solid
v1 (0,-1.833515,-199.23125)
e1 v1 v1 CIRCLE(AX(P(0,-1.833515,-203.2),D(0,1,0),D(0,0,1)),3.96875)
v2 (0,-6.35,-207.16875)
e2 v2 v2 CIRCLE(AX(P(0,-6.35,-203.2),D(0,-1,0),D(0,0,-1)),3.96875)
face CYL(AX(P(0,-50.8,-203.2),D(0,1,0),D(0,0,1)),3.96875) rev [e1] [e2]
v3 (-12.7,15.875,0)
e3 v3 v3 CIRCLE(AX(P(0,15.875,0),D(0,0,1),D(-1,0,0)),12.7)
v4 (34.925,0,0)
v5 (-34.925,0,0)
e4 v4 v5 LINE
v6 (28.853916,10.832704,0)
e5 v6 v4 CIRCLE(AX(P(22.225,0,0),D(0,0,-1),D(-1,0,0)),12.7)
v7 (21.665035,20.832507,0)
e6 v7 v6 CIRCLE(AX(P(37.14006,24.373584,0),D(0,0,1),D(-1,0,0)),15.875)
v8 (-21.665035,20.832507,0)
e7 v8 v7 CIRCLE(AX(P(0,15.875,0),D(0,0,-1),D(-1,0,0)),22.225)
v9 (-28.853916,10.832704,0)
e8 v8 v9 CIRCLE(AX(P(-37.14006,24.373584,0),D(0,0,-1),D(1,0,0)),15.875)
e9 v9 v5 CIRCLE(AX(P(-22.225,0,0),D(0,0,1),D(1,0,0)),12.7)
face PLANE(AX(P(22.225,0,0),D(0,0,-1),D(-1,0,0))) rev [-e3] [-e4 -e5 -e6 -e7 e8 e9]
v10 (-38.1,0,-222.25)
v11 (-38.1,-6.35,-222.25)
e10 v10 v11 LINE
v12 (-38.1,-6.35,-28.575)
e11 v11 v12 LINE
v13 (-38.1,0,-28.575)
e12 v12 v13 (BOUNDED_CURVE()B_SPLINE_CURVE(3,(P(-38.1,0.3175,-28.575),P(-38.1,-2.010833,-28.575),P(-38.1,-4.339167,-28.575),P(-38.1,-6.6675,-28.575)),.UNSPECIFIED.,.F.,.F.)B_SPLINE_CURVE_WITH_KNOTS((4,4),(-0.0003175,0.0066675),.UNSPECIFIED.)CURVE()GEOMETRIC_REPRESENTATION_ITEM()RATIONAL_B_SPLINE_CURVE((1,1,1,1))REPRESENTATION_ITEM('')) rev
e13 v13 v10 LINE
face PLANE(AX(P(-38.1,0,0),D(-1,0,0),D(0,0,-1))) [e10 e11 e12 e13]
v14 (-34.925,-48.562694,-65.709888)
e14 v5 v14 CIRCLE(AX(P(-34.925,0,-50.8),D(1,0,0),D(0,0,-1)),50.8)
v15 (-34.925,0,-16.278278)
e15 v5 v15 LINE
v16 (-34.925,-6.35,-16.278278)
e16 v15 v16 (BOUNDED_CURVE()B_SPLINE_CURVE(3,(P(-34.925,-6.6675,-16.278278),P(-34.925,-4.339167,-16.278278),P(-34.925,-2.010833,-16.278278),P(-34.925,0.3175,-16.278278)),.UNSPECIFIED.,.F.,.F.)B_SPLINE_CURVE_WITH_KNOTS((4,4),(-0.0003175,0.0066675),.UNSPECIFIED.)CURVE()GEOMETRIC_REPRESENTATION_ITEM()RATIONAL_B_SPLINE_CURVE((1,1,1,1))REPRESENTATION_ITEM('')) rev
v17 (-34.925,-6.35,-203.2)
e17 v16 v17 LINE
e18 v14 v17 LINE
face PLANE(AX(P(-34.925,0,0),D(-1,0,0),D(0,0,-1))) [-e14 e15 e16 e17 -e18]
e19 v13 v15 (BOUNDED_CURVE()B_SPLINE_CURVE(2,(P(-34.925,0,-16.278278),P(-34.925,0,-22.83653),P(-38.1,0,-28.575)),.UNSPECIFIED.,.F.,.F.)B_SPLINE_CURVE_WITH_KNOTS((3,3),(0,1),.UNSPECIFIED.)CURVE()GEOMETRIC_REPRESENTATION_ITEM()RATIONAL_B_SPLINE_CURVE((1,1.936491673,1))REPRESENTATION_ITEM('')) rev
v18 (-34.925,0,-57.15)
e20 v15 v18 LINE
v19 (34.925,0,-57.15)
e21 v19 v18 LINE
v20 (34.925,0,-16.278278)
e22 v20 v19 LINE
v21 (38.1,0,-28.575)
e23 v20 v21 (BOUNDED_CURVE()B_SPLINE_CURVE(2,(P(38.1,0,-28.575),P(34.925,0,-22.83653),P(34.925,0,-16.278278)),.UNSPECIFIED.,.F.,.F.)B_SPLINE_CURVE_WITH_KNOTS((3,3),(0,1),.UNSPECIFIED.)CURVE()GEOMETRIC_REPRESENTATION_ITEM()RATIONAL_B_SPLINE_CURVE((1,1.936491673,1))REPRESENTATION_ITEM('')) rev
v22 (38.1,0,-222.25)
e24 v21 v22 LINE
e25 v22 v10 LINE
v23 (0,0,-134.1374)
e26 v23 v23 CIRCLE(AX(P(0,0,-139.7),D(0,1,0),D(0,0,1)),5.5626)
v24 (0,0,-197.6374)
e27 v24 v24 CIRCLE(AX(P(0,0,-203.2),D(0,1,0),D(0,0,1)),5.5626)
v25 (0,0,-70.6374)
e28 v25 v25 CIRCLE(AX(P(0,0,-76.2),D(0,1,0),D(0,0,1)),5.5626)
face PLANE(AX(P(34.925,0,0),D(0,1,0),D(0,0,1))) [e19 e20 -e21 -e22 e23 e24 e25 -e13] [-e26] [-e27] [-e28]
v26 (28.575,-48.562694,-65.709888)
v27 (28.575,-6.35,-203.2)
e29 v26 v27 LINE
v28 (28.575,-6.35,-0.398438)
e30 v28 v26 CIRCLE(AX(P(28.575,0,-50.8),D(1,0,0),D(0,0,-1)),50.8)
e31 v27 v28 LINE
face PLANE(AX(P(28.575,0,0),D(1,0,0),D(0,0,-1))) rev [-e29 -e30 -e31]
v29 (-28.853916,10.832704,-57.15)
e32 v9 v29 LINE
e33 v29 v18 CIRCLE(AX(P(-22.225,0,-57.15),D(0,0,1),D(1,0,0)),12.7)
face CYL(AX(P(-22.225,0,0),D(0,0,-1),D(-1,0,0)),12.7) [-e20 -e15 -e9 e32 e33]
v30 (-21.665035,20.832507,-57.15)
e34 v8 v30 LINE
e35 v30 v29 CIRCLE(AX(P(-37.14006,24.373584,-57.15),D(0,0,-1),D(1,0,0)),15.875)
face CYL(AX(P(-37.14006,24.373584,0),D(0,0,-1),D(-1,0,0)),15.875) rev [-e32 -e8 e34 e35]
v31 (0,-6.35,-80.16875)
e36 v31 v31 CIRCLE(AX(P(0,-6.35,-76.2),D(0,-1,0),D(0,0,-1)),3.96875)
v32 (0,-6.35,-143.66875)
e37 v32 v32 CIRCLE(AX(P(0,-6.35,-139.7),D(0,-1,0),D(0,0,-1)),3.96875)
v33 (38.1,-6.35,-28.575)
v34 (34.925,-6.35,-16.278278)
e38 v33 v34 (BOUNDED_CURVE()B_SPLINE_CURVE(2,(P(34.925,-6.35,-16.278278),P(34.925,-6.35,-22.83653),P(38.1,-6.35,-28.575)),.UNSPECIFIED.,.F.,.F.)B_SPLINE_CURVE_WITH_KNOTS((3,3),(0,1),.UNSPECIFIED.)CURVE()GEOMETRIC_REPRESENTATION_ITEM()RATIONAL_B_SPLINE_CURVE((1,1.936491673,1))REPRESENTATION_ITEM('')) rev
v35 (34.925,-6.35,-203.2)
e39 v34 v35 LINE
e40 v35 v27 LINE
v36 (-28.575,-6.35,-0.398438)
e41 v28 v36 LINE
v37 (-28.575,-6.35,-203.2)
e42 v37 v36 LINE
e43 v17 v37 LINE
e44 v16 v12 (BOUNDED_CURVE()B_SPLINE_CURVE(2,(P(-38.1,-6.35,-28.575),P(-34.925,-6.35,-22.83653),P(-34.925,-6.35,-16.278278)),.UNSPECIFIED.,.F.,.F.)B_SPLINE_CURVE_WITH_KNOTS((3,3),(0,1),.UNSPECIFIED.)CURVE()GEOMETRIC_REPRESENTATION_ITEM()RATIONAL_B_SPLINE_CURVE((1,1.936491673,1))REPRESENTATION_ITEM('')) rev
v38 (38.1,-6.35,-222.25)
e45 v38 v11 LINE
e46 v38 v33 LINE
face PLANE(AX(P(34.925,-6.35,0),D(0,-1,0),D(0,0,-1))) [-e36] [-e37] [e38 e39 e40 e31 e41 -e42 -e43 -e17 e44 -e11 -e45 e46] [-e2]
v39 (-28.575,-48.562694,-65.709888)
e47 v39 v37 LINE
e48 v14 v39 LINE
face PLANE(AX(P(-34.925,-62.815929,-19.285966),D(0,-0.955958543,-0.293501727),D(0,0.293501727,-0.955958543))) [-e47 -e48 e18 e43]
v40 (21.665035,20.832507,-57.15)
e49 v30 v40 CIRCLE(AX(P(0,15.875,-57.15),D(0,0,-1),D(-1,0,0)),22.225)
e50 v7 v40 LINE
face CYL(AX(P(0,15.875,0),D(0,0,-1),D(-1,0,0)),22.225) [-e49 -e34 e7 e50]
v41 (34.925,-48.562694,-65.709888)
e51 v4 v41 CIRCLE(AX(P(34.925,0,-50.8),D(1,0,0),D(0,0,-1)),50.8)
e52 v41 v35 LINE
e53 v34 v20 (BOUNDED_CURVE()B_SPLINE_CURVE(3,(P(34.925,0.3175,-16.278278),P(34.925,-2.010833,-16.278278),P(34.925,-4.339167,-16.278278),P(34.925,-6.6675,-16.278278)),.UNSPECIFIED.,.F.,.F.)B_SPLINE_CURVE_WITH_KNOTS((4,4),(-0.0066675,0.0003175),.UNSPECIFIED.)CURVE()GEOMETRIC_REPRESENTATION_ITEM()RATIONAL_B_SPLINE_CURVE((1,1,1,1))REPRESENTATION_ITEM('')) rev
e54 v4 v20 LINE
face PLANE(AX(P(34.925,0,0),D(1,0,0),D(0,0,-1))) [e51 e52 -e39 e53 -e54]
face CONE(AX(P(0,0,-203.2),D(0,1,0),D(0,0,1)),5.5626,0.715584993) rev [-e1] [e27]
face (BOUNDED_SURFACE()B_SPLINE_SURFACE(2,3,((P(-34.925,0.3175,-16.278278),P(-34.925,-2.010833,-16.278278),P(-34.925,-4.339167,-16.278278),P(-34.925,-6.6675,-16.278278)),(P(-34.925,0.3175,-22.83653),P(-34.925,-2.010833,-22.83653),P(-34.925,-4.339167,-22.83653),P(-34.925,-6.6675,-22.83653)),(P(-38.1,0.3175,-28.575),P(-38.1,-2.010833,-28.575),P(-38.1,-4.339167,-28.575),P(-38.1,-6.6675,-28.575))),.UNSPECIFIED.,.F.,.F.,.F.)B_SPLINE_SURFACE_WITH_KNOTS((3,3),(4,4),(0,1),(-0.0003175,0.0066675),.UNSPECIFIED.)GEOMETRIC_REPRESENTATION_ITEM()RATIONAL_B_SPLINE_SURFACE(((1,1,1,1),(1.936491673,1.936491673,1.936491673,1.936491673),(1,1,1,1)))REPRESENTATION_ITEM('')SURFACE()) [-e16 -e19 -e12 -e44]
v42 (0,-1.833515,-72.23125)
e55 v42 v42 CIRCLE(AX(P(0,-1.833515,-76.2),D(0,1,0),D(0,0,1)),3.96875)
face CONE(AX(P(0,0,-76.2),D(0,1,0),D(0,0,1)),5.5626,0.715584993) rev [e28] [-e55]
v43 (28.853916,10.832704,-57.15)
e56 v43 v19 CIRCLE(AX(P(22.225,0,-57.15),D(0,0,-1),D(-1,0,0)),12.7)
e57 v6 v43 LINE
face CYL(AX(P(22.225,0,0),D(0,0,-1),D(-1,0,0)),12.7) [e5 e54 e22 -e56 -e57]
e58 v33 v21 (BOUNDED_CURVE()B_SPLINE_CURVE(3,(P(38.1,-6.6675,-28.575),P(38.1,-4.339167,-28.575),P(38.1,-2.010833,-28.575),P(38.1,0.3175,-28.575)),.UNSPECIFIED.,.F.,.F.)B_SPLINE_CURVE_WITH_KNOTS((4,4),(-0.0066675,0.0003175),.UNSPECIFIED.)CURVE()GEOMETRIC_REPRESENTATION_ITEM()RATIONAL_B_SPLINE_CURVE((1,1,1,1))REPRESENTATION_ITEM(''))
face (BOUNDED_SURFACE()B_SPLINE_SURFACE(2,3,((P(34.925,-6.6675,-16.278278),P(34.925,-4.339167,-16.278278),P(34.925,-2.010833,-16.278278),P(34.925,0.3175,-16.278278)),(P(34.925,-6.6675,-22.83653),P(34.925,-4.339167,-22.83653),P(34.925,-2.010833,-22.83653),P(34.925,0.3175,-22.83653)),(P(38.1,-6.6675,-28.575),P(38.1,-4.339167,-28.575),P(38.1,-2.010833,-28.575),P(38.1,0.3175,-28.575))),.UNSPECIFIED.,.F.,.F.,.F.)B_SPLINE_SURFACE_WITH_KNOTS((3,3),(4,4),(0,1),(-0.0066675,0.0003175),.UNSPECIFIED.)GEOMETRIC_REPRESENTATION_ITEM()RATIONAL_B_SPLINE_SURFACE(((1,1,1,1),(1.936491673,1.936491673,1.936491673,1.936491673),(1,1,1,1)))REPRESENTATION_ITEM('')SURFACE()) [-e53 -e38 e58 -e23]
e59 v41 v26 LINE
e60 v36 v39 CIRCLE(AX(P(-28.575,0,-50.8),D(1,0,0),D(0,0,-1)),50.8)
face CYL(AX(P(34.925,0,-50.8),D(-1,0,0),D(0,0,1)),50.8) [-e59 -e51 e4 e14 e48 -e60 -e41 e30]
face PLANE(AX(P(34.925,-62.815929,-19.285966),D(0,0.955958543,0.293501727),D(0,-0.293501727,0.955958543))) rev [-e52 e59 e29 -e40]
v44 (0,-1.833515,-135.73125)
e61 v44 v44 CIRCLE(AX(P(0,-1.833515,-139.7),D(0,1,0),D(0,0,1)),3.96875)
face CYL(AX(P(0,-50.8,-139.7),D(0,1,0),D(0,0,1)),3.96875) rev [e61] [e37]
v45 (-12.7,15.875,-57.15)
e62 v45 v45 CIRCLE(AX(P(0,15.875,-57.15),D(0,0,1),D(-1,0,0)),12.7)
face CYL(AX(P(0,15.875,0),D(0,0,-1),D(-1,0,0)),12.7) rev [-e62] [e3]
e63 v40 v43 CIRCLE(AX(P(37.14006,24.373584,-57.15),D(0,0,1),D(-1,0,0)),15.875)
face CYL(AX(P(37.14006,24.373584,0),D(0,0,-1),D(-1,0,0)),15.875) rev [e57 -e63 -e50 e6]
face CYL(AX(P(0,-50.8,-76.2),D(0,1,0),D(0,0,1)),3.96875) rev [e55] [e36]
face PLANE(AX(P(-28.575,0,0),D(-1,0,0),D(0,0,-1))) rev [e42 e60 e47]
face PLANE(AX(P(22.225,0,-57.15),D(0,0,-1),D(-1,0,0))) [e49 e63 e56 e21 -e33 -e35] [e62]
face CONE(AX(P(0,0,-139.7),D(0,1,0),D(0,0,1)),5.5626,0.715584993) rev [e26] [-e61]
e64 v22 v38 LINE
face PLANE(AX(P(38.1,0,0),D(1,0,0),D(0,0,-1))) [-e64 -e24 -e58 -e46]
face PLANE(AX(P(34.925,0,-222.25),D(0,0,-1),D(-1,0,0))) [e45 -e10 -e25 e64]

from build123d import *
from build123d.topology import SkipClean

# Parameters (mm, degrees)
BOSS_EXTRUDE1_DEPTH                             = 34.925
BOSS_EXTRUDE2_DEPTH                             = 38.1
CUT_EXTRUDE1_DEPTH                              = 28.575
FILLET1_START                                   = -6.35
FILLET1_DEPTH                                   = 6.35
BOSS_EXTRUDE3_START                             = -165.1
BOSS_EXTRUDE3_DEPTH                             = 57.15
SKETCH4_R                                       = 3.96875
CUT_EXTRUDE3_DEPTH                              = 232.143489097
CSK_FOR_12_FLAT_HEAD_MACHINE_SCREW1_D           = 5.7912
CSK_FOR_12_FLAT_HEAD_MACHINE_SCREW1_CSINK_D     = 11.1252
CSK_FOR_12_FLAT_HEAD_MACHINE_SCREW1_CSINK_ANGLE = 82


with BuildPart() as part:
    # Sketch2 → Boss-Extrude1 (new body)
    with BuildSketch(Plane(origin=(0, 0, 0), x_dir=(0, 0, -1), z_dir=(1, 0, 0))):
        with BuildLine():
            Line((28.575, -6.35), (0.398437524, -6.35))
            ThreePointArc((0.398437524, -6.35), (23.224782374, -42.664357172), (65.709887751, -48.562693987))
            Line((65.709887751, -48.562693987), (203.2, -6.35))
            Line((203.2, -6.35), (28.575, -6.35))
        make_face()
        Polygon((222.25, 0), (28.575, 0), (28.575, -6.35), (203.2, -6.35), (222.25, -6.35), align=None)
        with BuildLine():
            Line((28.575, 0), (0, 0))
            ThreePointArc((0, 0), (0.099707231, -3.181243957), (0.398437524, -6.35))
            Line((0.398437524, -6.35), (28.575, -6.35))
            Line((28.575, -6.35), (28.575, 0))
        make_face()
    boss_extrude1 = extrude(amount=BOSS_EXTRUDE1_DEPTH)

    # Sketch2<3> → Boss-Extrude2 (add)
    with BuildSketch(Plane(origin=(0, 0, 0), x_dir=(0, 0, -1), z_dir=(1, 0, 0))):
        Polygon((222.25, 0), (28.575, 0), (28.575, -6.35), (203.2, -6.35), (222.25, -6.35), align=None)
    boss_extrude2 = extrude(amount=BOSS_EXTRUDE2_DEPTH)

    # Sketch2<4> → Cut-Extrude1 (cut)
    with BuildSketch(Plane(origin=(0, 0, 0), x_dir=(0, 0, -1), z_dir=(1, 0, 0))):
        with BuildLine():
            Line((28.575, -6.35), (0.398437524, -6.35))
            ThreePointArc((0.398437524, -6.35), (23.224782374, -42.664357172), (65.709887751, -48.562693987))
            Line((65.709887751, -48.562693987), (203.2, -6.35))
            Line((203.2, -6.35), (28.575, -6.35))
        make_face()
    cut_extrude1 = extrude(amount=CUT_EXTRUDE1_DEPTH, mode=Mode.SUBTRACT)

    # Fillet1: read off the stored shape, not the designer's step
    # Fillet1 outline → Fillet1 (add)
    with BuildSketch(Plane(origin=(0, 0, 0), x_dir=(1, 0, 0), z_dir=(0, 1, 0)).offset(FILLET1_START)):
        with BuildLine():
            Line((34.925, 28.575), (34.925, 16.278277876))
            add(Edge.make_bspline(
                [(34.925, 16.278277876), (34.925, 22.836529675), (38.1, 28.575)],
                knots=[0, 0, 0, 1, 1, 1], degree=2, weights=[1, 1.936491673, 1]))
            Line((38.1, 28.575), (34.925, 28.575))
        make_face()
    fillet1 = extrude(amount=FILLET1_DEPTH)

    # Sketch3 → Boss-Extrude3 (add)
    with BuildSketch(Plane(origin=(0, 0, -222.25), x_dir=(-1, 0, 0), z_dir=(0, 0, -1)).offset(BOSS_EXTRUDE3_START)):
        with BuildLine():
            Line((0, 0), (0, 3.175))
            ThreePointArc((0, 3.175), (-12.7, 15.875), (0, 28.575))
            Line((0, 28.575), (0, 38.1))
            ThreePointArc((0, 38.1), (-13.852256532, 33.255034924), (-21.665035078, 20.832507443))
            ThreePointArc((-21.665035078, 20.832507443), (-24.250245873, 15.107068484), (-28.853915615, 10.832704084))
            ThreePointArc((-28.853915615, 10.832704084), (-33.303746055, 6.208976231), (-34.925, 0))
            Line((-34.925, 0), (0, 0))
        make_face()
    boss_extrude3 = extrude(amount=-BOSS_EXTRUDE3_DEPTH)

    # Mirror1: Boss-Extrude1, Boss-Extrude2, Cut-Extrude1, Fillet1, Boss-Extrude3 across plane
    with SkipClean():  # the faces are left unmerged after this step: merging them gives an invalid solid
        add(boss_extrude1.mirror(Plane(origin=(0, 28.575, 0), x_dir=(0, 0, 1), z_dir=(-1, 0, 0))))
        add(boss_extrude2.mirror(Plane(origin=(0, 28.575, 0), x_dir=(0, 0, 1), z_dir=(-1, 0, 0))))
        add(cut_extrude1.mirror(Plane(origin=(0, 28.575, 0), x_dir=(0, 0, 1), z_dir=(-1, 0, 0))), mode=Mode.SUBTRACT)
        add(fillet1.mirror(Plane(origin=(0, 28.575, 0), x_dir=(0, 0, 1), z_dir=(-1, 0, 0))))
        add(boss_extrude3.mirror(Plane(origin=(0, 28.575, 0), x_dir=(0, 0, 1), z_dir=(-1, 0, 0))))

    # Sketch4 → Cut-Extrude3 (cut, through all)
    with SkipClean():  # the faces are left unmerged after this step: merging them gives an invalid solid
        with BuildSketch(Plane(origin=(0, 0, 0), x_dir=(1, 0, 0), z_dir=(0, 1, 0))):
            with Locations(Location((0, 203.2, 0), (0, 0, 270))):
                Circle(SKETCH4_R)
            with Locations(Location((0, 139.7, 0), (0, 0, 270))):
                Circle(SKETCH4_R)
            with Locations(Location((0, 76.2, 0), (0, 0, 270))):
                Circle(SKETCH4_R)
        extrude(amount=-CUT_EXTRUDE3_DEPTH, mode=Mode.SUBTRACT)

    # CSK for #12 Flat Head Machine Screw1 (through all)
    with Locations(Plane(origin=(0, 0, 0), x_dir=(1, 0, 0), z_dir=(0, 1, 0))):
        with Locations((0, 76.2), (0, 139.7), (0, 203.2)):
            CounterSinkHole(CSK_FOR_12_FLAT_HEAD_MACHINE_SCREW1_D / 2, CSK_FOR_12_FLAT_HEAD_MACHINE_SCREW1_CSINK_D / 2, counter_sink_angle=CSK_FOR_12_FLAT_HEAD_MACHINE_SCREW1_CSINK_ANGLE)


solid = part.part
